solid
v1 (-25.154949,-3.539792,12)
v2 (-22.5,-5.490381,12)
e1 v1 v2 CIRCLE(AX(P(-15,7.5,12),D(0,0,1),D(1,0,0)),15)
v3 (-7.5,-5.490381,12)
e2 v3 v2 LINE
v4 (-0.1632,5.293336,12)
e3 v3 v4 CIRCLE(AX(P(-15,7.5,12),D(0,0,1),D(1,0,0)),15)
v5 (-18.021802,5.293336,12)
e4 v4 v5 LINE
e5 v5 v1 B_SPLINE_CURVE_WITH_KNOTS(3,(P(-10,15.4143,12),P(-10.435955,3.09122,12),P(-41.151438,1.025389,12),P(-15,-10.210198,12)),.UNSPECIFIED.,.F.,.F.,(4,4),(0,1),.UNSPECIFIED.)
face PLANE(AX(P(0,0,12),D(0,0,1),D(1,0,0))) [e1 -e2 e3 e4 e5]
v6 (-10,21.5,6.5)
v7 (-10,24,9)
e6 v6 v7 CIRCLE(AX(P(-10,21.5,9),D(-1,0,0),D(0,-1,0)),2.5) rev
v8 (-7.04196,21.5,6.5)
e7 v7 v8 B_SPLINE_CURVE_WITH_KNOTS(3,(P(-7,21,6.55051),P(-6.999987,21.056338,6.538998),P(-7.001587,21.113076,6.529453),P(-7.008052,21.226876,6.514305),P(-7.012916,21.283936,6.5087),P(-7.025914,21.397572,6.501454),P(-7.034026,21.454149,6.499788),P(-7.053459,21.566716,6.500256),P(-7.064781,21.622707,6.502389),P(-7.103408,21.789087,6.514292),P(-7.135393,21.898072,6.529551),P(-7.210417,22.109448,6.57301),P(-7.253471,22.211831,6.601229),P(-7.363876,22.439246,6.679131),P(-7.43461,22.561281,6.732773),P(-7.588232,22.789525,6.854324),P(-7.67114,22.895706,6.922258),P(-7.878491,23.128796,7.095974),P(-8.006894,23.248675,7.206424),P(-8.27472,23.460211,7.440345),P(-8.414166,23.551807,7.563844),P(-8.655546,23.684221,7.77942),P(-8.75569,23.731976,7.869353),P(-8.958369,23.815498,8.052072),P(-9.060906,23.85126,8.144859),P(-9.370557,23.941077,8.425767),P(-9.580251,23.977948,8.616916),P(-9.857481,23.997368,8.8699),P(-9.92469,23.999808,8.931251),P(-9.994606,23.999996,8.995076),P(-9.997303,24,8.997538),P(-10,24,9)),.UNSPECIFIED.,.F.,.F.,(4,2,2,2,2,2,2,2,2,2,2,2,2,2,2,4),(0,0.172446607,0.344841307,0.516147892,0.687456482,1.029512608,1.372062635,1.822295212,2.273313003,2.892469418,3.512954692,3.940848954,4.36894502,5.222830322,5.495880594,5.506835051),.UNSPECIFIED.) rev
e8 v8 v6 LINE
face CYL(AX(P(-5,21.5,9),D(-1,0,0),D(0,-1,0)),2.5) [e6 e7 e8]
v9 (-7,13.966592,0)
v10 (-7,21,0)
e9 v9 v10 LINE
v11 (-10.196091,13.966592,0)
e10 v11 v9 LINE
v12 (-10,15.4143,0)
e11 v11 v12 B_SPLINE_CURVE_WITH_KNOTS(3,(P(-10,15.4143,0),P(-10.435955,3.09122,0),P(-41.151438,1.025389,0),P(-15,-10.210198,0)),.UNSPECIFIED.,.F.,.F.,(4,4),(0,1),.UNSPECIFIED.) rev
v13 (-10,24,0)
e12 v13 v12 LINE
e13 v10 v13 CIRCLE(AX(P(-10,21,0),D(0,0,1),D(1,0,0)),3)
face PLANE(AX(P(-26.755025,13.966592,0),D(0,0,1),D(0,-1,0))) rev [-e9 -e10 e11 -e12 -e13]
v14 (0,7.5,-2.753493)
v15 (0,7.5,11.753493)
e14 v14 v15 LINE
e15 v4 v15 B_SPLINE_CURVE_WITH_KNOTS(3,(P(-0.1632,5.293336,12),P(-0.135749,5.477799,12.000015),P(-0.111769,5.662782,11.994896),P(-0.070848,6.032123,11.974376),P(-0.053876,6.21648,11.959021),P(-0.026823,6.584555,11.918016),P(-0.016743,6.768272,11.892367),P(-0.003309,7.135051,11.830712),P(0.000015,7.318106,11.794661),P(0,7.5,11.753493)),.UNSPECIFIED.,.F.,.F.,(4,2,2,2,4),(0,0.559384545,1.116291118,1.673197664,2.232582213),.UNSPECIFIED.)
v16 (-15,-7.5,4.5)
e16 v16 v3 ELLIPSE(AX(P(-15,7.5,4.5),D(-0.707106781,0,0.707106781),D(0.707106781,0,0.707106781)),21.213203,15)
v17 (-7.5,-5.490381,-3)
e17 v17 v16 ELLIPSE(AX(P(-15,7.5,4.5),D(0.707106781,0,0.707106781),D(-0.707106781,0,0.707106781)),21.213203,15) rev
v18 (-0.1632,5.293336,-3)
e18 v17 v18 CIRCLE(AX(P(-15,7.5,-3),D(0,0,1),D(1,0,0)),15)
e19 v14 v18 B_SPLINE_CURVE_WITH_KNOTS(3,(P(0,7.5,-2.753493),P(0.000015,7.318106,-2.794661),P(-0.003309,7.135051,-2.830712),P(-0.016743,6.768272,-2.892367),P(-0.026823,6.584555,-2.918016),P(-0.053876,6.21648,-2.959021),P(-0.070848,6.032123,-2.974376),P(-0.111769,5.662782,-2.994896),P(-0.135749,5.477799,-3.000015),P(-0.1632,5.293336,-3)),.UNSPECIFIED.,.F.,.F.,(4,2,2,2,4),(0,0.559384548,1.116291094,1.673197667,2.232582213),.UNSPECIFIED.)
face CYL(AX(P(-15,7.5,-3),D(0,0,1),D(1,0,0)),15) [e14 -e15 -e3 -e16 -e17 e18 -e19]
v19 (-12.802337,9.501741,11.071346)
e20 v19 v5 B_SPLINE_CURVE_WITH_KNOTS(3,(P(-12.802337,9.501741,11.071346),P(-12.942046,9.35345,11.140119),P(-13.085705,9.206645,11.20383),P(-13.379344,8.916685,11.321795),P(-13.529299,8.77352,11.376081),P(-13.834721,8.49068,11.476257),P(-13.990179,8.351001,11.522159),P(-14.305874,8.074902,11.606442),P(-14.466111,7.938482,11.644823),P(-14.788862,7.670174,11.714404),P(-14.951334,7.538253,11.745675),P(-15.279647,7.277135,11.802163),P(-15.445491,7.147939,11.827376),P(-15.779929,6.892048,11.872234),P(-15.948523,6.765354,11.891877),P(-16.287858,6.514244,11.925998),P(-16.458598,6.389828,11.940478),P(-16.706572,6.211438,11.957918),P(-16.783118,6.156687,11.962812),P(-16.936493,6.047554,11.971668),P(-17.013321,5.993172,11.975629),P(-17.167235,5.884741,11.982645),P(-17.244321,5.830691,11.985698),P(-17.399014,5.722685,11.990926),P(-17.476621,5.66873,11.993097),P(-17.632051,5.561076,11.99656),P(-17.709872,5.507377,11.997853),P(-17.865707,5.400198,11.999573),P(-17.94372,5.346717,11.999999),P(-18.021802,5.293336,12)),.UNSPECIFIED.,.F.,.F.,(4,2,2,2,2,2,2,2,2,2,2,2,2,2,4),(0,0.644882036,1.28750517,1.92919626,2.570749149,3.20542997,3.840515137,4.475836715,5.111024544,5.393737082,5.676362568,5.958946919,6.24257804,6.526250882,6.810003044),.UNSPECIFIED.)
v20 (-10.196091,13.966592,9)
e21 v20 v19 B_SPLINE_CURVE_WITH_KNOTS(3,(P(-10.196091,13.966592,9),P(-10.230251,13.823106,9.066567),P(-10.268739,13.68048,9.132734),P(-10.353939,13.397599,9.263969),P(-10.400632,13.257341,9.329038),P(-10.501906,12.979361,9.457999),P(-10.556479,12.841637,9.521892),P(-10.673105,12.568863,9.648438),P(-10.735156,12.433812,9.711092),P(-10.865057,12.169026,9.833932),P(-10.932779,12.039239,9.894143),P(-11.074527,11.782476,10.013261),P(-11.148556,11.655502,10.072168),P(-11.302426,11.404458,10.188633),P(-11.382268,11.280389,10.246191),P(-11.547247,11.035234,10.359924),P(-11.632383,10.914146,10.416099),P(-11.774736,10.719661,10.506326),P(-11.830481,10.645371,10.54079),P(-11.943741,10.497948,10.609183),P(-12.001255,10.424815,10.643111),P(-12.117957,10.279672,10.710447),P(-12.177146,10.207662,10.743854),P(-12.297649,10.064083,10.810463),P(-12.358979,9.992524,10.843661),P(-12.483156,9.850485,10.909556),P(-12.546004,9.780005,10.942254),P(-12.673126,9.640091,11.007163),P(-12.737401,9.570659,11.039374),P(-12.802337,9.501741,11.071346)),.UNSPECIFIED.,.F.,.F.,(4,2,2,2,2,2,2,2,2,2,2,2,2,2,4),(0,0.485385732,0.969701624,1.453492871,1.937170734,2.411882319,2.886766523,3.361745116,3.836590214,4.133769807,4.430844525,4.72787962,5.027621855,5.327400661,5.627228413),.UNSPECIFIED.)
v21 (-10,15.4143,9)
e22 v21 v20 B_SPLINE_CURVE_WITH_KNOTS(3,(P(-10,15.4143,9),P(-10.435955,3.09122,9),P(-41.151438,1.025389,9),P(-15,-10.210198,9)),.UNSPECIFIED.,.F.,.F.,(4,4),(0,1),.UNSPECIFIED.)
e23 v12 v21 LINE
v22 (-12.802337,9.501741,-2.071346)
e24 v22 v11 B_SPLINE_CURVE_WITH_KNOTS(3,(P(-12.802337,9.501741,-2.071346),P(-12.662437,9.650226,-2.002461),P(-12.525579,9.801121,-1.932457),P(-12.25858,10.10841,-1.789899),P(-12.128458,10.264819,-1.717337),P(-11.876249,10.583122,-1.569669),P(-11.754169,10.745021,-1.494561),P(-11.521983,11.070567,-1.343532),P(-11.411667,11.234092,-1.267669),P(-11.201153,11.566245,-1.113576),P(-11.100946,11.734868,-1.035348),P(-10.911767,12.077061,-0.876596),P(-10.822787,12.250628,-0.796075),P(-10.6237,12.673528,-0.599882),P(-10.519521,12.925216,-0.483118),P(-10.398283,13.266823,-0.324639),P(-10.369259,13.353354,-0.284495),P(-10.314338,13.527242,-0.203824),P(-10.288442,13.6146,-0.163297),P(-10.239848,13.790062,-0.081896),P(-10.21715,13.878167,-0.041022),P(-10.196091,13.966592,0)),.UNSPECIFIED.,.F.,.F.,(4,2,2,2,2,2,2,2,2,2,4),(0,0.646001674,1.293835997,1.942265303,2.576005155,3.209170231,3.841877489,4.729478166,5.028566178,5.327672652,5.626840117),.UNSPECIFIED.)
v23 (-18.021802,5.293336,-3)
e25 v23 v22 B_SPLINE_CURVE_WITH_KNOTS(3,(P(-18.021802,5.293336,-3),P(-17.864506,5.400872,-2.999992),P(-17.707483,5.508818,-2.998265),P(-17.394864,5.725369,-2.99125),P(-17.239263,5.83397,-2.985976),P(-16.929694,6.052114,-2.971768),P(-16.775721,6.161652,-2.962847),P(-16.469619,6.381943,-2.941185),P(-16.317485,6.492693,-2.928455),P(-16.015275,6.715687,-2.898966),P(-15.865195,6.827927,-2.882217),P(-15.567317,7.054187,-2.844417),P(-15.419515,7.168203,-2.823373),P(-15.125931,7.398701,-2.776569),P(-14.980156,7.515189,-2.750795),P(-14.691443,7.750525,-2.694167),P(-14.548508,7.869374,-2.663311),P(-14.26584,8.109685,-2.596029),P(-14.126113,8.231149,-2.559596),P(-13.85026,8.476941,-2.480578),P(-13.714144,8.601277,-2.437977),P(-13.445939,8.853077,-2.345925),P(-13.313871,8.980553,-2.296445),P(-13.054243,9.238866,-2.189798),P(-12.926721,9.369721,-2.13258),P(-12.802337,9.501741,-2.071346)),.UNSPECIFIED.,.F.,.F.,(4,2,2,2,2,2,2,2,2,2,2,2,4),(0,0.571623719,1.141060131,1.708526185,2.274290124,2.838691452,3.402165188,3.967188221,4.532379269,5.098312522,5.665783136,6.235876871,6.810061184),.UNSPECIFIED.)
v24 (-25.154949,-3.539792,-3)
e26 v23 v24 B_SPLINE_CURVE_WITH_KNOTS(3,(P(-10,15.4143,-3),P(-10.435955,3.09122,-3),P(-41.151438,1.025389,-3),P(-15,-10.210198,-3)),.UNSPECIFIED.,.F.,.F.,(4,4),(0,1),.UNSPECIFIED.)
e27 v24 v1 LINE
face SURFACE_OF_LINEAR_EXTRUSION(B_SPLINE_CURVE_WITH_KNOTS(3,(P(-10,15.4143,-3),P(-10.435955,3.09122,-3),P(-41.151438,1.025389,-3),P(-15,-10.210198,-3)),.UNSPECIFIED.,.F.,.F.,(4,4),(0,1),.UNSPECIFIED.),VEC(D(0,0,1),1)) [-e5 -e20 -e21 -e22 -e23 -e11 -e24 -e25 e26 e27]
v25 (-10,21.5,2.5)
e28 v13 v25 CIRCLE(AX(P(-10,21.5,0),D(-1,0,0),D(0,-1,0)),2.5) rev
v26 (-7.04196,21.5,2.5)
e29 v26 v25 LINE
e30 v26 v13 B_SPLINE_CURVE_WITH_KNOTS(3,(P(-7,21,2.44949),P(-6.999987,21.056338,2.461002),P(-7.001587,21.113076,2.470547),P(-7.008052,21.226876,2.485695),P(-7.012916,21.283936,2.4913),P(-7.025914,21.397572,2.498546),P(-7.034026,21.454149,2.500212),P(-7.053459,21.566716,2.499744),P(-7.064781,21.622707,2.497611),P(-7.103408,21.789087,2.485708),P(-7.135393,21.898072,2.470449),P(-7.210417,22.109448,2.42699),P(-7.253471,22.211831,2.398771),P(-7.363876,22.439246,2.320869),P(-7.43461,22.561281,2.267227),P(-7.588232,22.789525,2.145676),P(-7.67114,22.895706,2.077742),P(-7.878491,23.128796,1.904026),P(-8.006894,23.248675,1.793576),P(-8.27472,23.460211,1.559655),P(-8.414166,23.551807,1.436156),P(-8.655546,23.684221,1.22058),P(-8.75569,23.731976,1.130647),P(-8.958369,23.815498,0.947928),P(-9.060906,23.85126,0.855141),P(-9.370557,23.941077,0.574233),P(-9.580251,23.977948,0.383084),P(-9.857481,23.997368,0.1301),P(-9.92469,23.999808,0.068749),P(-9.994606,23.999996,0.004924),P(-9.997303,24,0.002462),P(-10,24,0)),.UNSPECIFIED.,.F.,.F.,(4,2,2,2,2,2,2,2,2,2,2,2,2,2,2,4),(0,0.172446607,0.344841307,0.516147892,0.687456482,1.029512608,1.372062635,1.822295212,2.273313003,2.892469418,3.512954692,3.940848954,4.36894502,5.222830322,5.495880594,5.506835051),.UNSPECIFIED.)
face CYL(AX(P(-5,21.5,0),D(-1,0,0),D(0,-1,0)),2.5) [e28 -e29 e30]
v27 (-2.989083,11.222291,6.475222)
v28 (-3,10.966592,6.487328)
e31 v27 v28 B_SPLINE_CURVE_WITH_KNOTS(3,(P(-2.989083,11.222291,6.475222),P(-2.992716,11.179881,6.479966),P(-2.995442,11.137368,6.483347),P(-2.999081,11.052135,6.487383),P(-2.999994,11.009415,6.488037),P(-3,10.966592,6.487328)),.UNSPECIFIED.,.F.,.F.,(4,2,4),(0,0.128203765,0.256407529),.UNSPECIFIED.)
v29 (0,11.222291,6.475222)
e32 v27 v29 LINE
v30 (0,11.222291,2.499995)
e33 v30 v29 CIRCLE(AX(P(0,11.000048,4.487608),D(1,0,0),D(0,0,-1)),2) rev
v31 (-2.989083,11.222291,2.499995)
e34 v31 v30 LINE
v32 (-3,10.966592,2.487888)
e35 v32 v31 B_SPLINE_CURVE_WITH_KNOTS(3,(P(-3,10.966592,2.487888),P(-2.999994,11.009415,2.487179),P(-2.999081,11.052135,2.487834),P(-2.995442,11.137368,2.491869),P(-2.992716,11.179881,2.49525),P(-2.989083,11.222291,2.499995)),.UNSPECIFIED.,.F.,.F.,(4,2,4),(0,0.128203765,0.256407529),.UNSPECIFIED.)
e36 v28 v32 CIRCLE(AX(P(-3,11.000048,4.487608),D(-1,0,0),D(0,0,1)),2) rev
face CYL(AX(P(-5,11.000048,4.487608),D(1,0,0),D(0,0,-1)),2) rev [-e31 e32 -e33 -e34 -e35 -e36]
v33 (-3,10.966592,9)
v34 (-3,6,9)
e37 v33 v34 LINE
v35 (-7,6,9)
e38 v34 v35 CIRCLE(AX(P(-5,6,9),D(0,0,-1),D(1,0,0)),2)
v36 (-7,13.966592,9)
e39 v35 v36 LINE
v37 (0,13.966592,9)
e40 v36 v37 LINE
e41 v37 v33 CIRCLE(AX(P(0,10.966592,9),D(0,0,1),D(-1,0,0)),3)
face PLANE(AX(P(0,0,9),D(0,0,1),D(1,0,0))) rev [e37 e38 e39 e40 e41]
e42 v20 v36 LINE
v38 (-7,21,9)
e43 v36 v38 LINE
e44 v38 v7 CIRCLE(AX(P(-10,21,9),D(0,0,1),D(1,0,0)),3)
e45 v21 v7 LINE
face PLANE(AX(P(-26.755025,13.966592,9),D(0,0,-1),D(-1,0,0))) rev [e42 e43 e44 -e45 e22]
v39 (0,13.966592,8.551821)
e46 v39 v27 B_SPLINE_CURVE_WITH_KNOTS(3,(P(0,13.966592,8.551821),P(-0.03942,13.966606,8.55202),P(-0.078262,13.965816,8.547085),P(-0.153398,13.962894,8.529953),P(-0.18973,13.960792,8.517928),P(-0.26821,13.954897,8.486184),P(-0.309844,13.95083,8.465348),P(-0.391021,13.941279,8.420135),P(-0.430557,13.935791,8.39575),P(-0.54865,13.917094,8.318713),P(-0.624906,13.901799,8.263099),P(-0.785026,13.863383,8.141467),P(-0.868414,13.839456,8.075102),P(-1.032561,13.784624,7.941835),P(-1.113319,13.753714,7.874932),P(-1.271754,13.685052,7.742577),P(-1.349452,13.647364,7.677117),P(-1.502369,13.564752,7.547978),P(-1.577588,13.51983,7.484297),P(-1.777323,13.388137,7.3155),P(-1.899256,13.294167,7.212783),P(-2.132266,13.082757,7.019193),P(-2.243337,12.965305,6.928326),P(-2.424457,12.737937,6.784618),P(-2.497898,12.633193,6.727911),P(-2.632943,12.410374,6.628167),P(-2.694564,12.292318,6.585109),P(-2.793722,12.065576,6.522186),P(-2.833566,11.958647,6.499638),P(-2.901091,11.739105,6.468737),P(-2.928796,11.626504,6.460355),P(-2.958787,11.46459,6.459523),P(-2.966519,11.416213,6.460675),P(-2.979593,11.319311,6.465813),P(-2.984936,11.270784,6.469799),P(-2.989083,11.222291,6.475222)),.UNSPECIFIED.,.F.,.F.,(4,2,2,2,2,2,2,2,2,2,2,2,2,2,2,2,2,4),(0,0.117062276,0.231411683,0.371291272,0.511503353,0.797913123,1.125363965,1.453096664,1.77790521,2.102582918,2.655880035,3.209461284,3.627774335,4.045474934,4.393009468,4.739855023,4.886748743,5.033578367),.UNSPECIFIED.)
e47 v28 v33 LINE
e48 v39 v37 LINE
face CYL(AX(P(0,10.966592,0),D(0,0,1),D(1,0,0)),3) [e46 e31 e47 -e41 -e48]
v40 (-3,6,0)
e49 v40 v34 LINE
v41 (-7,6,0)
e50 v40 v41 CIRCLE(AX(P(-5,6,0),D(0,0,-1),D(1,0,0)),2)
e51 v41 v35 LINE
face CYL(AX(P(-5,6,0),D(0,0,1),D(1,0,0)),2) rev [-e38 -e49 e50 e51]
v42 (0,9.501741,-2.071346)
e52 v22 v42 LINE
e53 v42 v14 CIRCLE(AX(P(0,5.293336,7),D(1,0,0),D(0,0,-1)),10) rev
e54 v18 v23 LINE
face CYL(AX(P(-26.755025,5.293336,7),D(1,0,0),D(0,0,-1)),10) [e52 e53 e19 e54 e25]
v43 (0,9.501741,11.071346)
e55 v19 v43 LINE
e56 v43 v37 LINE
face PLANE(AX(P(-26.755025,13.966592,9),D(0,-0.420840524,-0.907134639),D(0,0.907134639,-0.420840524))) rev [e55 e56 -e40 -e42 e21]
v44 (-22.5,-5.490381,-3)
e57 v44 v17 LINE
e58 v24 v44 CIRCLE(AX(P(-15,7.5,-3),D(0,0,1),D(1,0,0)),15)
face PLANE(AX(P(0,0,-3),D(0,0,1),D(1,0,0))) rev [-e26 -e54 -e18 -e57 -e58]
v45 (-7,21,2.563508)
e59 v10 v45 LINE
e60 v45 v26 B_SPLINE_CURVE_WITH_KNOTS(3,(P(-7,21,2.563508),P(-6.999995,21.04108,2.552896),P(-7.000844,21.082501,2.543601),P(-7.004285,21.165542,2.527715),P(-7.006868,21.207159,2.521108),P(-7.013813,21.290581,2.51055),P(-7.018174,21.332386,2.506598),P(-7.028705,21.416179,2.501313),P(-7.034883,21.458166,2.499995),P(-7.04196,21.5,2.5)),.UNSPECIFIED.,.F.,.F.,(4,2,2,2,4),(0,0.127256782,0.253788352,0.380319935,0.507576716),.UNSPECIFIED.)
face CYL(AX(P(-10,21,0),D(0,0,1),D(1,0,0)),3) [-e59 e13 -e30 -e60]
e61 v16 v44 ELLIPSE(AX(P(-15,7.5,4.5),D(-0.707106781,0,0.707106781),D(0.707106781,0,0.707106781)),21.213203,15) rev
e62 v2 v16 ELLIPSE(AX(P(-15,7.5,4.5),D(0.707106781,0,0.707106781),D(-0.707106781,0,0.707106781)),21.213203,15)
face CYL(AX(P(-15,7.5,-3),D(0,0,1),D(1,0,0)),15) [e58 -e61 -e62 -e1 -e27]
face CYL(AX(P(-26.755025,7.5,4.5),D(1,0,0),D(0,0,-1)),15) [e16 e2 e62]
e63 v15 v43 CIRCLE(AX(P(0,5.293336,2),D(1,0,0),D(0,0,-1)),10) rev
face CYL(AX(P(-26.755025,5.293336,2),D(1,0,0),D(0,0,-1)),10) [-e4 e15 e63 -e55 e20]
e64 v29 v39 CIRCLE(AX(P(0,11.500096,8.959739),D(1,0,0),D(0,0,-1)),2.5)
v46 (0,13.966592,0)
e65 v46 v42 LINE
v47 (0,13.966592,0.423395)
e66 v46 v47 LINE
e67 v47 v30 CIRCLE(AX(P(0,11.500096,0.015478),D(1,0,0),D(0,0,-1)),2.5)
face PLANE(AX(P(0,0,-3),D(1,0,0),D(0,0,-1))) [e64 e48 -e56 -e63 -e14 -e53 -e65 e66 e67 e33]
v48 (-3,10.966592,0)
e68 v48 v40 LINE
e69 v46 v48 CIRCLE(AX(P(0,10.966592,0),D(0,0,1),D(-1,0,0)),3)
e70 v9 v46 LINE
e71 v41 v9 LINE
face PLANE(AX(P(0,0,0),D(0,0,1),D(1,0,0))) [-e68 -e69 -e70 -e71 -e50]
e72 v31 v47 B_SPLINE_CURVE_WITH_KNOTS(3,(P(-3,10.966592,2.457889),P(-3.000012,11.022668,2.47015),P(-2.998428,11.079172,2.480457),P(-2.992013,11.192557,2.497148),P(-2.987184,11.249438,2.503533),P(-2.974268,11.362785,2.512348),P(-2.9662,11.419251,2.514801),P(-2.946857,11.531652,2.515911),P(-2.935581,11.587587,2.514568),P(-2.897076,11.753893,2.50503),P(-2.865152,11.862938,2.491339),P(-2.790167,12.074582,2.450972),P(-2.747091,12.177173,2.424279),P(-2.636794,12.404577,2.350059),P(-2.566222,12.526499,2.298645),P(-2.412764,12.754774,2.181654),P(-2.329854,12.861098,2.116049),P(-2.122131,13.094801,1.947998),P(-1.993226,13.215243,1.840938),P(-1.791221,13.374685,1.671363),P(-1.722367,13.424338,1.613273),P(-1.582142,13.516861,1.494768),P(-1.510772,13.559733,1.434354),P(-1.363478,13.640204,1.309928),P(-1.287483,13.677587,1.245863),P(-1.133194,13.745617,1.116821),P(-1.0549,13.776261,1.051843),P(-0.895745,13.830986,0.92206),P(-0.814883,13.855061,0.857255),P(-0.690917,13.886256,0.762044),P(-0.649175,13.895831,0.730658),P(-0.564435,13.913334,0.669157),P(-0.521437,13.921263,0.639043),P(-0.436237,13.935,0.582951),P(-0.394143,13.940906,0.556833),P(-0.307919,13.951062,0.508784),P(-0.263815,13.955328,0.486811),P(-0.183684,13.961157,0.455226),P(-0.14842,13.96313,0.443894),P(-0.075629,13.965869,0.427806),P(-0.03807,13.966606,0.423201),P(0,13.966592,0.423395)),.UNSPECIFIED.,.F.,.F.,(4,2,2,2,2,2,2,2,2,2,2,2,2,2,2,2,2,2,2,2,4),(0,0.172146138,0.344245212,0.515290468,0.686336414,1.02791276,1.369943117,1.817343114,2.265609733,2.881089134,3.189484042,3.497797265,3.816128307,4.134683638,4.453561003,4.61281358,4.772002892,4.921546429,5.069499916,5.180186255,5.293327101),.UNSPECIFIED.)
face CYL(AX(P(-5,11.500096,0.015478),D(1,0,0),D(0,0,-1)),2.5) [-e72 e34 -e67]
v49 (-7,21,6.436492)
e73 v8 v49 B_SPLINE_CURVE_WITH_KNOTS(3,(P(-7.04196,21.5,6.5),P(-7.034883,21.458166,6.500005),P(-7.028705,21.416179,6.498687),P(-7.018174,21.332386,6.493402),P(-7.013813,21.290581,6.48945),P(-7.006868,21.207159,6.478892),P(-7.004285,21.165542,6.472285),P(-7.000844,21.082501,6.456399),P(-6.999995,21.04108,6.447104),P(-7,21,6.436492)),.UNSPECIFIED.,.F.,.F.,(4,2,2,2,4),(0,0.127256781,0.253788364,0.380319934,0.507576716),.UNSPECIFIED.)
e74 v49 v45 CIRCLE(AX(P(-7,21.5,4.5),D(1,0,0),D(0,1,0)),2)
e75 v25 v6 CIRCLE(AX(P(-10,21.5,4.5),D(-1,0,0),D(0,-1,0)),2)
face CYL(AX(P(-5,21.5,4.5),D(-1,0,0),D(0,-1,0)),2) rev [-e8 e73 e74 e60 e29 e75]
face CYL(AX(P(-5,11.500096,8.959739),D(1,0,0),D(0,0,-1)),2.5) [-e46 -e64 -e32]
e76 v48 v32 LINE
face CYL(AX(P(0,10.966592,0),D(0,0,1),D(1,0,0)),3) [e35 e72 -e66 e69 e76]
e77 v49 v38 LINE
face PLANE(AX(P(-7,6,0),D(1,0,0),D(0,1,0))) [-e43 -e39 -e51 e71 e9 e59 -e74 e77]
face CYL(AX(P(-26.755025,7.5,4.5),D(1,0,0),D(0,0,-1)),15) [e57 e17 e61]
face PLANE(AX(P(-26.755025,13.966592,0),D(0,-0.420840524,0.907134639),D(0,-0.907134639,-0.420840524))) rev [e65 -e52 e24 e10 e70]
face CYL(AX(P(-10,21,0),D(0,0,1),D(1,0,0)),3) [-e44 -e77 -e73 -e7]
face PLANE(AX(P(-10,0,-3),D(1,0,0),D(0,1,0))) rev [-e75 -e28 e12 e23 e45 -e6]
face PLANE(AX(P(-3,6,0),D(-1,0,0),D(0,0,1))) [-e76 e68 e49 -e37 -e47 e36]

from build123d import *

# Parameters (mm, degrees)
SKETCH1_R                = 2
SKETCH1_R_2              = 2.6
BOSS_EXTRUDE1_DEPTH      = 9
FILLET1_R                = 4
SKETCH3_W                = 1
SKETCH3_H                = 25
CUT_EXTRUDE2_DEPTH       = 131.694299799
CUT_EXTRUDE3_DEPTH       = 132.837020597
BOSS_EXTRUDE2_DEPTH      = 3
BOSS_EXTRUDE4_DEPTH      = 5
CUT_EXTRUDE4_DEPTH       = 2
FILLET2_R                = 20
FILLET3_R                = 4
BOSS_EXTRUDE5_DEPTH      = 12
BOSS_EXTRUDE5_DEPTH_BACK = 3
CUT_EXTRUDE5_DEPTH       = 134.026557597
CUT_EXTRUDE5_DEPTH_BACK  = 134.026557597


with BuildPart() as part:
    # Sketch1 → Boss-Extrude1 (new body)
    with BuildSketch(Plane.XY):
        Polygon((0, 0), (-10, 0), (-10, 30), (-20, 90), (-20, 130), (-10, 130), (-10, 90), (0, 30), align=None)
        with Locations((-15, 100)):
            Circle(SKETCH1_R, mode=Mode.SUBTRACT)
        with Locations((-15, 125)):
            Circle(SKETCH1_R_2, mode=Mode.SUBTRACT)
    extrude(amount=BOSS_EXTRUDE1_DEPTH)

    # Fillet1
    fillet1_edges = [part.edges().sort_by_distance(p)[0] for p in [
        (0, 0, 4.5),
        (-10, 0, 4.5),
    ]]
    fillet(fillet1_edges, radius=FILLET1_R)

    # Sketch3 → Cut-Extrude2 (cut, through all)
    with BuildSketch(Plane.ZY.offset(10)):
        with Locations((0.5, 117.5)):
            Rectangle(SKETCH3_W, SKETCH3_H)
    extrude(amount=CUT_EXTRUDE2_DEPTH, mode=Mode.SUBTRACT)

    # Sketch5 → Cut-Extrude3 (cut, through all)
    with BuildSketch(Plane.XY.offset(9)):
        with BuildLine():
            Line((-10, 4), (-10, 24))
            ThreePointArc((-10, 24), (-7.878679656, 23.121320344), (-7, 21))
            Line((-7, 21), (-7, 6))
            ThreePointArc((-7, 6), (-5, 4), (-3, 6))
            Line((-3, 6), (-3, 10.96659189))
            ThreePointArc((-3, 10.96659189), (-2.121320344, 13.087912234), (0, 13.96659189))
            Line((0, 13.96659189), (0, 4))
            ThreePointArc((0, 4), (-1.171572875, 1.171572875), (-4, 0))
            Line((-4, 0), (-6, 0))
            ThreePointArc((-6, 0), (-8.828427125, 1.171572875), (-10, 4))
        make_face()
    extrude(amount=-CUT_EXTRUDE3_DEPTH, mode=Mode.SUBTRACT)

    # Boss-Extrude2: read off the stored shape, not the designer's step
    # Boss-Extrude2 outline → Boss-Extrude2 (add)
    with BuildSketch(Plane.ZY):
        with BuildLine():
            Line((9, 13.96659189), (9, 30))
            Line((9, 30), (0, 30))
            Line((0, 30), (0, 13.96659189))
            Line((0, 13.96659189), (0.423395215, 13.96659189))
            ThreePointArc((0.423395215, 13.96659189), (2.009052541, 13.008624555), (2.499994655, 11.222291324))
            ThreePointArc((2.499994655, 11.222291324), (4.487608253, 9.000047793), (6.47522185, 11.222291324))
            ThreePointArc((6.47522185, 11.222291324), (6.966163965, 13.008624555), (8.551821291, 13.96659189))
            Line((8.551821291, 13.96659189), (9, 13.96659189))
        make_face()
    extrude(amount=BOSS_EXTRUDE2_DEPTH)

    # Sketch8 → Boss-Extrude4 (add)
    with BuildSketch(Plane.ZY.offset(10)):
        with BuildLine():
            Line((2.5, 21.5), (6.5, 21.5))
            ThreePointArc((6.5, 21.5), (4.5, 19.5), (2.5, 21.5))
        make_face()
        with BuildLine():
            ThreePointArc((0, 24), (1.767766953, 23.267766953), (2.5, 21.5))
            Line((2.5, 21.5), (6.5, 21.5))
            ThreePointArc((6.5, 21.5), (7.232233047, 23.267766953), (9, 24))
            Line((9, 24), (0, 24))
        make_face()
    extrude(amount=-BOSS_EXTRUDE4_DEPTH)

    # Sketch9 → Cut-Extrude4 (cut)
    with BuildSketch(Plane(origin=(4.931969619, 0.408182285, 0), x_dir=(0, 0, -1), z_dir=(0.9863939238321437, 0.16439898730535749, 0))):
        with BuildLine():
            Line((-7, 37), (-7, 85.827625303))
            ThreePointArc((-7, 85.827625303), (-4.5, 88.327625303), (-2, 85.827625303))
            Line((-2, 85.827625303), (-2, 37))
            ThreePointArc((-2, 37), (-4.5, 34.5), (-7, 37))
        make_face()
    cut_extrude4 = extrude(amount=-CUT_EXTRUDE4_DEPTH, mode=Mode.SUBTRACT)

    # Mirror1: Cut-Extrude4 across plane
    add(cut_extrude4.mirror(Plane(origin=(0, 0, 0), x_dir=(0, 0, 1), z_dir=(0.9863939238321437, 0.16439898730535743, 0))), mode=Mode.SUBTRACT)

    # Fillet2
    fillet2_edges = [part.edges().sort_by_distance(p)[0] for p in [
        (-10, 30, 4.5),
        (-20, 90, 4.5),
        (-10, 90, 4.5),
        (0, 30, 4.5),
    ]]
    fillet(fillet2_edges, radius=FILLET2_R)

    # Fillet3
    fillet3_edges = [part.edges().sort_by_distance(p)[0] for p in [
        (-20, 130, 5),
        (-10, 130, 5),
    ]]
    fillet(fillet3_edges, radius=FILLET3_R)


with BuildPart() as body_2:
    # Sketch1<5> → Boss-Extrude5 (new, two sides: drawn at the far end of the back side and taken through both)
    with BuildSketch(Plane.XY.offset(-BOSS_EXTRUDE5_DEPTH_BACK)):
        with BuildLine():
            ThreePointArc((-25.154949118, -3.539792045), (-8.971908958, -6.235432952), (0, 7.5))
            Line((0, 7.5), (0, 27.350317066))
            Line((0, 27.350317066), (-10, 27.350317066))
            Line((-10, 27.350317066), (-10, 15.414300315))
            add(Edge.make_bspline(
                [(-10, 15.414300315), (-10.3332076, 5.995566791), (-28.355100317, 2.568910038), (-25.154949118, -3.539792045)],
                knots=[0, 0, 0, 0, 0.764316477, 0.764316477, 0.764316477, 0.764316477], degree=3))
        make_face()
    extrude(amount=BOSS_EXTRUDE5_DEPTH + BOSS_EXTRUDE5_DEPTH_BACK)

    # Sketch10 → Cut-Extrude5 (cut, two sides: drawn at the far end of the back side and taken through both)
    with BuildSketch(Plane(origin=(0, 0, 0), x_dir=(0, 0, -1), z_dir=(1, 0, 0)).offset(-CUT_EXTRUDE5_DEPTH_BACK)):
        with BuildLine():
            Line((-9, 13.96659189), (-9, 28.344749394))
            Line((-9, 28.344749394), (-14.199341922, 29.234870168))
            Line((-14.199341922, 29.234870168), (-18.34923463, 5.372987094))
            Line((-18.34923463, 5.372987094), (-14.775715909, -10.880759347))
            Line((-14.775715909, -10.880759347), (12.313861494, -10.073835765))
            Line((12.313861494, -10.073835765), (10.584739532, 28.344749394))
            Line((10.584739532, 28.344749394), (0, 28.344749394))
            Line((0, 28.344749394), (0, 13.96659189))
            Line((0, 13.96659189), (2.071346392, 9.501741297))
            ThreePointArc((2.071346392, 9.501741297), (2.765077161, 7.448160424), (3, 5.29333606))
            Line((3, 5.29333606), (3, -5.490381057))
            ThreePointArc((3, -5.490381057), (-4.5, -7.5), (-12, -5.490381057))
            Line((-12, -5.490381057), (-12, 5.29333606))
            ThreePointArc((-12, 5.29333606), (-11.765077161, 7.448160424), (-11.071346392, 9.501741297))
            Line((-11.071346392, 9.501741297), (-9, 13.96659189))
        make_face()
    extrude(amount=CUT_EXTRUDE5_DEPTH + CUT_EXTRUDE5_DEPTH_BACK, mode=Mode.SUBTRACT)

    # Combine1: cut part
    add(part.part, mode=Mode.SUBTRACT)


solid = body_2.part
